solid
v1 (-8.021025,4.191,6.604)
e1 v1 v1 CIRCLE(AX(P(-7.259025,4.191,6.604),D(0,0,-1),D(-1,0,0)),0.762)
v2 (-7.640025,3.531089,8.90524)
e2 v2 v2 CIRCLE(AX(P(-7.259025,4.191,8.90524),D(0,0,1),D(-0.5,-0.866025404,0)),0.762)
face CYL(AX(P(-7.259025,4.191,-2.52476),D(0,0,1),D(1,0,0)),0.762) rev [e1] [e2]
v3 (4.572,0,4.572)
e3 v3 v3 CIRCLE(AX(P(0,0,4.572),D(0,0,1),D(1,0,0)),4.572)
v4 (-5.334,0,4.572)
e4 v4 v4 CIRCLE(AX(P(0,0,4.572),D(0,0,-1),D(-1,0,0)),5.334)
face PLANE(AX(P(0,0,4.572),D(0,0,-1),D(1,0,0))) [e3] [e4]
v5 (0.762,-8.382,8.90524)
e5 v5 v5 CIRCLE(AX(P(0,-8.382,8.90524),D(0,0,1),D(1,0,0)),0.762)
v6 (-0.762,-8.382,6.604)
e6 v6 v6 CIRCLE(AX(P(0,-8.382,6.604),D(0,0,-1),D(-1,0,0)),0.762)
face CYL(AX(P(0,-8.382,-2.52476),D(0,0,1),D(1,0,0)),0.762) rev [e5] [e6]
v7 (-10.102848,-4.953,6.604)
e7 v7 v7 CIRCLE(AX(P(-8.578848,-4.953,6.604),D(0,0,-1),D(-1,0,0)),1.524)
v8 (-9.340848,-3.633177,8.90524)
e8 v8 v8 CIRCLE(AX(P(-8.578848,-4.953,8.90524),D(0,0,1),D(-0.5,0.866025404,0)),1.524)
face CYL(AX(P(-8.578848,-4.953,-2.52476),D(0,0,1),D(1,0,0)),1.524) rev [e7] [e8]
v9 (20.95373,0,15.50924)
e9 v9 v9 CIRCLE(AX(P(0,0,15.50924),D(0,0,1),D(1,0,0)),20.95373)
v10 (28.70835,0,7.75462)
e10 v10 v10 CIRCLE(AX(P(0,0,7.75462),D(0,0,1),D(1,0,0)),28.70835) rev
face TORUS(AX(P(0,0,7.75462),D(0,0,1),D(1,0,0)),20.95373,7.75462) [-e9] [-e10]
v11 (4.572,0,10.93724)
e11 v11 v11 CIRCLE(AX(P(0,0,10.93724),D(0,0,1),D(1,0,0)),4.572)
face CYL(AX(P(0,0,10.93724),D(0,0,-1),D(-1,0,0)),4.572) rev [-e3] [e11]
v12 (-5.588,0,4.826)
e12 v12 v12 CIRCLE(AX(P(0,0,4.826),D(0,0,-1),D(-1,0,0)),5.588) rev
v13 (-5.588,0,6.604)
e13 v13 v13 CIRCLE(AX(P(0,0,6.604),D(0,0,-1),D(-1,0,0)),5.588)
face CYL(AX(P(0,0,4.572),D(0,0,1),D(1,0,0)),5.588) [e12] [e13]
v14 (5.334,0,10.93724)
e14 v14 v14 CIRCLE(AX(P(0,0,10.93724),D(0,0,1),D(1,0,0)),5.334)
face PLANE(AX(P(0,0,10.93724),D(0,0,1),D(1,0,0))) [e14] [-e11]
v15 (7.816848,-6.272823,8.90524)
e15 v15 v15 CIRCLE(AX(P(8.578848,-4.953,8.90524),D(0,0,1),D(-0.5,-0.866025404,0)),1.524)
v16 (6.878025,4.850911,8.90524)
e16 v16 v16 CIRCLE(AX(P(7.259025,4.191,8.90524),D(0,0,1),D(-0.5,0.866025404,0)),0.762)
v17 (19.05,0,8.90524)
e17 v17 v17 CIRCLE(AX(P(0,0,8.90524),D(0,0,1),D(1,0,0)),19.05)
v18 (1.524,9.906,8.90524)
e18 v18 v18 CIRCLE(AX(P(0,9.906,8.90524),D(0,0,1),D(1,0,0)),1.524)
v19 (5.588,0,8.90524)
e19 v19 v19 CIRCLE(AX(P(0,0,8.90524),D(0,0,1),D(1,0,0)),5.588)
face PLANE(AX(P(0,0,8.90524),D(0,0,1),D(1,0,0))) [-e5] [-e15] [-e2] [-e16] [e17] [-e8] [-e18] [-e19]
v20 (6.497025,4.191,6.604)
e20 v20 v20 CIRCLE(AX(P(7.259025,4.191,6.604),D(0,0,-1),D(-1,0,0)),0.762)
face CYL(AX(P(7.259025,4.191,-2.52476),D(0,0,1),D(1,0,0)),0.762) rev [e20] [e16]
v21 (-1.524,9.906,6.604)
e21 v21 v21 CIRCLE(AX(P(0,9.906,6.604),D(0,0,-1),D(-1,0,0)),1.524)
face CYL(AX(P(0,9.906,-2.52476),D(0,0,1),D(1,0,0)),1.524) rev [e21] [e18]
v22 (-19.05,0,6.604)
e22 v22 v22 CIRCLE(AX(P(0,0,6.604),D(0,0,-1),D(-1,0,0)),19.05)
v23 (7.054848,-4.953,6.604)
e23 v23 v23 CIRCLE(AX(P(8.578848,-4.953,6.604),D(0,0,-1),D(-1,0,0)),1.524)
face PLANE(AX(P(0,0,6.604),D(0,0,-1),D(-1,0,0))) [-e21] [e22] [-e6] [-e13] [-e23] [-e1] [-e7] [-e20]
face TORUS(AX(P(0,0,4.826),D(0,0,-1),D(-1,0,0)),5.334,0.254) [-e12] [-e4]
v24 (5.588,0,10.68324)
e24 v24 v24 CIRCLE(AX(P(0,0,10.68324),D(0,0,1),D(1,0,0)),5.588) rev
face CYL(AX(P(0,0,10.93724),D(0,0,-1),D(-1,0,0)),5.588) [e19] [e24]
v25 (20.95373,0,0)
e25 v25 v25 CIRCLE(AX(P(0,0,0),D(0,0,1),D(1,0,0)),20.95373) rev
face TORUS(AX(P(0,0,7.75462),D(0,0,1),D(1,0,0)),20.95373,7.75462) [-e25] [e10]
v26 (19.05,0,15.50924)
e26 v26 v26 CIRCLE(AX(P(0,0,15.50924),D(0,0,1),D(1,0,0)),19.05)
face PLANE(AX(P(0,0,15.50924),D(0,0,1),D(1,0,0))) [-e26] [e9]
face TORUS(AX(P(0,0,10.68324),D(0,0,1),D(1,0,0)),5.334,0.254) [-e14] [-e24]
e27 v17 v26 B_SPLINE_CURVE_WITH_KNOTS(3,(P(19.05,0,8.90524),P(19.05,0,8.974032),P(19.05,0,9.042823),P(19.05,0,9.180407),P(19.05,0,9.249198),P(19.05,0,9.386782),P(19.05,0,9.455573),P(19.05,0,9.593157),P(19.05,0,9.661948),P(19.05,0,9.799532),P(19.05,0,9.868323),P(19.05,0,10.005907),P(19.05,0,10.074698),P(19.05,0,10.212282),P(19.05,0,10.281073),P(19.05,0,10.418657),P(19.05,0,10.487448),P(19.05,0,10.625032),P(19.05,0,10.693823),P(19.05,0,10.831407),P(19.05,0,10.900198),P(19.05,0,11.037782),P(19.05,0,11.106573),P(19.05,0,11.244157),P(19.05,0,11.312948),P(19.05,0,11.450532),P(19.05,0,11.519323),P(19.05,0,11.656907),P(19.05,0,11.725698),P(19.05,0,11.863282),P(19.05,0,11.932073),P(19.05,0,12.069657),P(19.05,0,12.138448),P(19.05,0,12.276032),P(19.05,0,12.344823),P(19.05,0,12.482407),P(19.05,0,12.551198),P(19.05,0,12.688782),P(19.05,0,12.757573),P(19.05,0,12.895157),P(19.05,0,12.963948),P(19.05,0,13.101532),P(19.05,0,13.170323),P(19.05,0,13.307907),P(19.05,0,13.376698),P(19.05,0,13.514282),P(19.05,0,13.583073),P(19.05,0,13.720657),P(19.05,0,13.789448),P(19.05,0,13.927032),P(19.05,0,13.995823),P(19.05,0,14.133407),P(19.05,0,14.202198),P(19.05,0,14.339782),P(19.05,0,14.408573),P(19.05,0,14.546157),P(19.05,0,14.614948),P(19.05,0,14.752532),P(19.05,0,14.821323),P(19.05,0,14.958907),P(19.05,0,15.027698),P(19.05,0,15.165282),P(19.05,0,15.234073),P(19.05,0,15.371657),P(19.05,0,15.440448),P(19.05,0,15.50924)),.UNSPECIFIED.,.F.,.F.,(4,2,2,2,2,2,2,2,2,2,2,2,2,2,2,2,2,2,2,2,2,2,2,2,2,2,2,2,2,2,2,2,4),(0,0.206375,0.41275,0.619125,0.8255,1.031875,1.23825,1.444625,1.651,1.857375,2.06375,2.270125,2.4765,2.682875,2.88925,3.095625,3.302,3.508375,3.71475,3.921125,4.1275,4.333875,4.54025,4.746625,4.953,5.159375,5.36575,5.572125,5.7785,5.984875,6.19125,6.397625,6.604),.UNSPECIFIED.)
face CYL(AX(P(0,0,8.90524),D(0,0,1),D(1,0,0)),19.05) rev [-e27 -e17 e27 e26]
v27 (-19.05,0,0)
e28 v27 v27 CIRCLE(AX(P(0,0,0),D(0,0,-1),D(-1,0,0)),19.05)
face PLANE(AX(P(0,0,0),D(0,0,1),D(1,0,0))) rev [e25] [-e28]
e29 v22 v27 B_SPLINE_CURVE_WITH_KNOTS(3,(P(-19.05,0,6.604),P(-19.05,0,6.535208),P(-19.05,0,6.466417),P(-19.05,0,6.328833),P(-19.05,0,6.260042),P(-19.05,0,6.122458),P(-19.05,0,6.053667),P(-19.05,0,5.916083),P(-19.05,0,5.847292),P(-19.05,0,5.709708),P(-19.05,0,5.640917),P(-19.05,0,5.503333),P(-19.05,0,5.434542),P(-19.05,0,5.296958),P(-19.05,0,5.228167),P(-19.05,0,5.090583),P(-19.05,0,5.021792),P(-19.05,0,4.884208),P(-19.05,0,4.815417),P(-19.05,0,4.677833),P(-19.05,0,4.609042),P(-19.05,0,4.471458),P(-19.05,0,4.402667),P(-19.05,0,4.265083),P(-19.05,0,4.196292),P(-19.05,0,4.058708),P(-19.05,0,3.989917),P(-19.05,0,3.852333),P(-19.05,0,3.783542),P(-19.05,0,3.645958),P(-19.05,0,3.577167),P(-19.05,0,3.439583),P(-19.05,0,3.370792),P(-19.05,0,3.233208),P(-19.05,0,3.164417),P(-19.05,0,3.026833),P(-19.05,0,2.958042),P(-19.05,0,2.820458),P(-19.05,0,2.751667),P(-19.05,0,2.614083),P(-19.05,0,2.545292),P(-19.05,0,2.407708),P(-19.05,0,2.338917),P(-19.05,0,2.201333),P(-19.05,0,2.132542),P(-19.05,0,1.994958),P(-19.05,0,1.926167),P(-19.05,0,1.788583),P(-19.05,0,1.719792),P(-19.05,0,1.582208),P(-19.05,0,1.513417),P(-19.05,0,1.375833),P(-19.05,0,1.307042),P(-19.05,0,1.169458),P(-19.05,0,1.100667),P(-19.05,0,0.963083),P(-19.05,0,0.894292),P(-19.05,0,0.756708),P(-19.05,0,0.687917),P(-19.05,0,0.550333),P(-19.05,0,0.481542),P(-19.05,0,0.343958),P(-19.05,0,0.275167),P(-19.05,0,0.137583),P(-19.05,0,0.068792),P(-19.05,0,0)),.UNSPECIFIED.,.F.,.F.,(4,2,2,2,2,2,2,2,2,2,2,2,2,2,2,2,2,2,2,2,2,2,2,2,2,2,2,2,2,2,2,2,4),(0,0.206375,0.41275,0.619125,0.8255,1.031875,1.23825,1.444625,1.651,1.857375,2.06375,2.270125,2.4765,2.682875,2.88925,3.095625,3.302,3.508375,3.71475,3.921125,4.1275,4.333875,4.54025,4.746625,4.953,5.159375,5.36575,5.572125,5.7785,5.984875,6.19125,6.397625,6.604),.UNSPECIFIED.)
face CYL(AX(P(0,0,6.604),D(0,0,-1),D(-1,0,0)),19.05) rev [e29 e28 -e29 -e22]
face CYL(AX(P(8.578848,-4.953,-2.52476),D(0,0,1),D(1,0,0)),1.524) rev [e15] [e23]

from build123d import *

# Parameters (mm, degrees)
SKETCH1_R           = 28.70835
BOSS_EXTRUDE1_DEPTH = 15.50924
FILLET1_R           = 7.75462
SKETCH2_R           = 19.05
CUT_EXTRUDE2_DEPTH  = 6.604
CUT_EXTRUDE3_START  = -6.604
SKETCH3_R           = 19.05
CUT_EXTRUDE3_DEPTH  = 6.604
SKETCH4_R           = 5.588
SKETCH4_R_2         = 4.572
BOSS_EXTRUDE2_DEPTH = 2.032
CUT_EXTRUDE4_START  = -11.43
SKETCH5_R           = 4.572
CUT_EXTRUDE4_DEPTH  = 11.43
SKETCH6_R           = 1.524
CUT_EXTRUDE5_DEPTH  = 11.43
CIRPATTERN1_COUNT   = 3
SKETCH10_R          = 0.762
CUT_EXTRUDE8_DEPTH  = 11.43
CIRPATTERN3_COUNT   = 3
FILLET2_R           = 0.254
FILLET3_R           = 0.254


with BuildPart() as part:
    # Sketch1 → Boss-Extrude1 (new body)
    with BuildSketch(Plane.XY):
        Circle(SKETCH1_R)
    extrude(amount=BOSS_EXTRUDE1_DEPTH)

    # Fillet1
    fillet1_edges = [part.edges().sort_by_distance(p)[0] for p in [
        (-28.70835, 0, 0),
        (-28.70835, 0, 15.50924),
    ]]
    fillet(fillet1_edges, radius=FILLET1_R - 0.0001)  # a hair under: the kernel refuses the full size

    # Sketch2 → Cut-Extrude2 (cut)
    with BuildSketch(Plane.XY.offset(15.50924)):
        Circle(SKETCH2_R)
    extrude(amount=-CUT_EXTRUDE2_DEPTH, mode=Mode.SUBTRACT)

    # Sketch3 → Cut-Extrude3 (cut)
    with BuildSketch(Plane(origin=(0, 0, 0), x_dir=(-1, 0, 0), z_dir=(0, 0, -1)).offset(CUT_EXTRUDE3_START)):
        with Locations(Location((0, 0, 0), (0, 0, 180))):
            Circle(SKETCH3_R)
    extrude(amount=CUT_EXTRUDE3_DEPTH, mode=Mode.SUBTRACT)

    # Sketch4 → Boss-Extrude2 (add)
    with BuildSketch(Plane.XY.offset(8.90524)):
        Circle(SKETCH4_R)
        Circle(SKETCH4_R_2, mode=Mode.SUBTRACT)
    boss_extrude2 = extrude(amount=BOSS_EXTRUDE2_DEPTH)

    # Sketch5 → Cut-Extrude4 (cut)
    with BuildSketch(Plane.XY.offset(8.90524).offset(CUT_EXTRUDE4_START)):
        with Locations(Location((0, 0, 0), (0, 0, 180))):
            Circle(SKETCH5_R)
    extrude(amount=CUT_EXTRUDE4_DEPTH, mode=Mode.SUBTRACT)

    # Mirror4: Boss-Extrude2 across plane
    add(boss_extrude2.mirror(Plane.XY.offset(7.75462)))

    # Sketch6 → Cut-Extrude5 (cut)
    with BuildSketch(Plane.XY.offset(8.90524)):
        with Locations((0, 9.906)):
            Circle(SKETCH6_R)
    cut_extrude5 = extrude(amount=-CUT_EXTRUDE5_DEPTH, mode=Mode.SUBTRACT)

    # CirPattern1: Cut-Extrude5 ×3 about axis
    cirpattern1_axis = Axis((0, 0, 0), (0, 0, 1))
    for i in range(1, CIRPATTERN1_COUNT):
        add(cut_extrude5.rotate(cirpattern1_axis, i * 360 / CIRPATTERN1_COUNT), mode=Mode.SUBTRACT)

    # Sketch10 → Cut-Extrude8 (cut)
    with BuildSketch(Plane.XY.offset(8.90524)):
        with Locations((0, -8.382)):
            Circle(SKETCH10_R)
    cut_extrude8 = extrude(amount=-CUT_EXTRUDE8_DEPTH, mode=Mode.SUBTRACT)

    # CirPattern3: Cut-Extrude8 ×3 about axis
    cirpattern3_axis = Axis((0, 0, 0), (0, 0, 1))
    for i in range(1, CIRPATTERN3_COUNT):
        add(cut_extrude8.rotate(cirpattern3_axis, i * 360 / CIRPATTERN3_COUNT), mode=Mode.SUBTRACT)

    # Fillet2
    fillet2_edges = [part.edges().sort_by_distance(p)[0] for p in [
        (-5.588, 0, 10.93724),
    ]]
    fillet(fillet2_edges, radius=FILLET2_R)

    # Fillet3
    fillet3_edges = [part.edges().sort_by_distance(p)[0] for p in [
        (-5.588, 0, 4.572),
    ]]
    fillet(fillet3_edges, radius=FILLET3_R)


solid = part.part
